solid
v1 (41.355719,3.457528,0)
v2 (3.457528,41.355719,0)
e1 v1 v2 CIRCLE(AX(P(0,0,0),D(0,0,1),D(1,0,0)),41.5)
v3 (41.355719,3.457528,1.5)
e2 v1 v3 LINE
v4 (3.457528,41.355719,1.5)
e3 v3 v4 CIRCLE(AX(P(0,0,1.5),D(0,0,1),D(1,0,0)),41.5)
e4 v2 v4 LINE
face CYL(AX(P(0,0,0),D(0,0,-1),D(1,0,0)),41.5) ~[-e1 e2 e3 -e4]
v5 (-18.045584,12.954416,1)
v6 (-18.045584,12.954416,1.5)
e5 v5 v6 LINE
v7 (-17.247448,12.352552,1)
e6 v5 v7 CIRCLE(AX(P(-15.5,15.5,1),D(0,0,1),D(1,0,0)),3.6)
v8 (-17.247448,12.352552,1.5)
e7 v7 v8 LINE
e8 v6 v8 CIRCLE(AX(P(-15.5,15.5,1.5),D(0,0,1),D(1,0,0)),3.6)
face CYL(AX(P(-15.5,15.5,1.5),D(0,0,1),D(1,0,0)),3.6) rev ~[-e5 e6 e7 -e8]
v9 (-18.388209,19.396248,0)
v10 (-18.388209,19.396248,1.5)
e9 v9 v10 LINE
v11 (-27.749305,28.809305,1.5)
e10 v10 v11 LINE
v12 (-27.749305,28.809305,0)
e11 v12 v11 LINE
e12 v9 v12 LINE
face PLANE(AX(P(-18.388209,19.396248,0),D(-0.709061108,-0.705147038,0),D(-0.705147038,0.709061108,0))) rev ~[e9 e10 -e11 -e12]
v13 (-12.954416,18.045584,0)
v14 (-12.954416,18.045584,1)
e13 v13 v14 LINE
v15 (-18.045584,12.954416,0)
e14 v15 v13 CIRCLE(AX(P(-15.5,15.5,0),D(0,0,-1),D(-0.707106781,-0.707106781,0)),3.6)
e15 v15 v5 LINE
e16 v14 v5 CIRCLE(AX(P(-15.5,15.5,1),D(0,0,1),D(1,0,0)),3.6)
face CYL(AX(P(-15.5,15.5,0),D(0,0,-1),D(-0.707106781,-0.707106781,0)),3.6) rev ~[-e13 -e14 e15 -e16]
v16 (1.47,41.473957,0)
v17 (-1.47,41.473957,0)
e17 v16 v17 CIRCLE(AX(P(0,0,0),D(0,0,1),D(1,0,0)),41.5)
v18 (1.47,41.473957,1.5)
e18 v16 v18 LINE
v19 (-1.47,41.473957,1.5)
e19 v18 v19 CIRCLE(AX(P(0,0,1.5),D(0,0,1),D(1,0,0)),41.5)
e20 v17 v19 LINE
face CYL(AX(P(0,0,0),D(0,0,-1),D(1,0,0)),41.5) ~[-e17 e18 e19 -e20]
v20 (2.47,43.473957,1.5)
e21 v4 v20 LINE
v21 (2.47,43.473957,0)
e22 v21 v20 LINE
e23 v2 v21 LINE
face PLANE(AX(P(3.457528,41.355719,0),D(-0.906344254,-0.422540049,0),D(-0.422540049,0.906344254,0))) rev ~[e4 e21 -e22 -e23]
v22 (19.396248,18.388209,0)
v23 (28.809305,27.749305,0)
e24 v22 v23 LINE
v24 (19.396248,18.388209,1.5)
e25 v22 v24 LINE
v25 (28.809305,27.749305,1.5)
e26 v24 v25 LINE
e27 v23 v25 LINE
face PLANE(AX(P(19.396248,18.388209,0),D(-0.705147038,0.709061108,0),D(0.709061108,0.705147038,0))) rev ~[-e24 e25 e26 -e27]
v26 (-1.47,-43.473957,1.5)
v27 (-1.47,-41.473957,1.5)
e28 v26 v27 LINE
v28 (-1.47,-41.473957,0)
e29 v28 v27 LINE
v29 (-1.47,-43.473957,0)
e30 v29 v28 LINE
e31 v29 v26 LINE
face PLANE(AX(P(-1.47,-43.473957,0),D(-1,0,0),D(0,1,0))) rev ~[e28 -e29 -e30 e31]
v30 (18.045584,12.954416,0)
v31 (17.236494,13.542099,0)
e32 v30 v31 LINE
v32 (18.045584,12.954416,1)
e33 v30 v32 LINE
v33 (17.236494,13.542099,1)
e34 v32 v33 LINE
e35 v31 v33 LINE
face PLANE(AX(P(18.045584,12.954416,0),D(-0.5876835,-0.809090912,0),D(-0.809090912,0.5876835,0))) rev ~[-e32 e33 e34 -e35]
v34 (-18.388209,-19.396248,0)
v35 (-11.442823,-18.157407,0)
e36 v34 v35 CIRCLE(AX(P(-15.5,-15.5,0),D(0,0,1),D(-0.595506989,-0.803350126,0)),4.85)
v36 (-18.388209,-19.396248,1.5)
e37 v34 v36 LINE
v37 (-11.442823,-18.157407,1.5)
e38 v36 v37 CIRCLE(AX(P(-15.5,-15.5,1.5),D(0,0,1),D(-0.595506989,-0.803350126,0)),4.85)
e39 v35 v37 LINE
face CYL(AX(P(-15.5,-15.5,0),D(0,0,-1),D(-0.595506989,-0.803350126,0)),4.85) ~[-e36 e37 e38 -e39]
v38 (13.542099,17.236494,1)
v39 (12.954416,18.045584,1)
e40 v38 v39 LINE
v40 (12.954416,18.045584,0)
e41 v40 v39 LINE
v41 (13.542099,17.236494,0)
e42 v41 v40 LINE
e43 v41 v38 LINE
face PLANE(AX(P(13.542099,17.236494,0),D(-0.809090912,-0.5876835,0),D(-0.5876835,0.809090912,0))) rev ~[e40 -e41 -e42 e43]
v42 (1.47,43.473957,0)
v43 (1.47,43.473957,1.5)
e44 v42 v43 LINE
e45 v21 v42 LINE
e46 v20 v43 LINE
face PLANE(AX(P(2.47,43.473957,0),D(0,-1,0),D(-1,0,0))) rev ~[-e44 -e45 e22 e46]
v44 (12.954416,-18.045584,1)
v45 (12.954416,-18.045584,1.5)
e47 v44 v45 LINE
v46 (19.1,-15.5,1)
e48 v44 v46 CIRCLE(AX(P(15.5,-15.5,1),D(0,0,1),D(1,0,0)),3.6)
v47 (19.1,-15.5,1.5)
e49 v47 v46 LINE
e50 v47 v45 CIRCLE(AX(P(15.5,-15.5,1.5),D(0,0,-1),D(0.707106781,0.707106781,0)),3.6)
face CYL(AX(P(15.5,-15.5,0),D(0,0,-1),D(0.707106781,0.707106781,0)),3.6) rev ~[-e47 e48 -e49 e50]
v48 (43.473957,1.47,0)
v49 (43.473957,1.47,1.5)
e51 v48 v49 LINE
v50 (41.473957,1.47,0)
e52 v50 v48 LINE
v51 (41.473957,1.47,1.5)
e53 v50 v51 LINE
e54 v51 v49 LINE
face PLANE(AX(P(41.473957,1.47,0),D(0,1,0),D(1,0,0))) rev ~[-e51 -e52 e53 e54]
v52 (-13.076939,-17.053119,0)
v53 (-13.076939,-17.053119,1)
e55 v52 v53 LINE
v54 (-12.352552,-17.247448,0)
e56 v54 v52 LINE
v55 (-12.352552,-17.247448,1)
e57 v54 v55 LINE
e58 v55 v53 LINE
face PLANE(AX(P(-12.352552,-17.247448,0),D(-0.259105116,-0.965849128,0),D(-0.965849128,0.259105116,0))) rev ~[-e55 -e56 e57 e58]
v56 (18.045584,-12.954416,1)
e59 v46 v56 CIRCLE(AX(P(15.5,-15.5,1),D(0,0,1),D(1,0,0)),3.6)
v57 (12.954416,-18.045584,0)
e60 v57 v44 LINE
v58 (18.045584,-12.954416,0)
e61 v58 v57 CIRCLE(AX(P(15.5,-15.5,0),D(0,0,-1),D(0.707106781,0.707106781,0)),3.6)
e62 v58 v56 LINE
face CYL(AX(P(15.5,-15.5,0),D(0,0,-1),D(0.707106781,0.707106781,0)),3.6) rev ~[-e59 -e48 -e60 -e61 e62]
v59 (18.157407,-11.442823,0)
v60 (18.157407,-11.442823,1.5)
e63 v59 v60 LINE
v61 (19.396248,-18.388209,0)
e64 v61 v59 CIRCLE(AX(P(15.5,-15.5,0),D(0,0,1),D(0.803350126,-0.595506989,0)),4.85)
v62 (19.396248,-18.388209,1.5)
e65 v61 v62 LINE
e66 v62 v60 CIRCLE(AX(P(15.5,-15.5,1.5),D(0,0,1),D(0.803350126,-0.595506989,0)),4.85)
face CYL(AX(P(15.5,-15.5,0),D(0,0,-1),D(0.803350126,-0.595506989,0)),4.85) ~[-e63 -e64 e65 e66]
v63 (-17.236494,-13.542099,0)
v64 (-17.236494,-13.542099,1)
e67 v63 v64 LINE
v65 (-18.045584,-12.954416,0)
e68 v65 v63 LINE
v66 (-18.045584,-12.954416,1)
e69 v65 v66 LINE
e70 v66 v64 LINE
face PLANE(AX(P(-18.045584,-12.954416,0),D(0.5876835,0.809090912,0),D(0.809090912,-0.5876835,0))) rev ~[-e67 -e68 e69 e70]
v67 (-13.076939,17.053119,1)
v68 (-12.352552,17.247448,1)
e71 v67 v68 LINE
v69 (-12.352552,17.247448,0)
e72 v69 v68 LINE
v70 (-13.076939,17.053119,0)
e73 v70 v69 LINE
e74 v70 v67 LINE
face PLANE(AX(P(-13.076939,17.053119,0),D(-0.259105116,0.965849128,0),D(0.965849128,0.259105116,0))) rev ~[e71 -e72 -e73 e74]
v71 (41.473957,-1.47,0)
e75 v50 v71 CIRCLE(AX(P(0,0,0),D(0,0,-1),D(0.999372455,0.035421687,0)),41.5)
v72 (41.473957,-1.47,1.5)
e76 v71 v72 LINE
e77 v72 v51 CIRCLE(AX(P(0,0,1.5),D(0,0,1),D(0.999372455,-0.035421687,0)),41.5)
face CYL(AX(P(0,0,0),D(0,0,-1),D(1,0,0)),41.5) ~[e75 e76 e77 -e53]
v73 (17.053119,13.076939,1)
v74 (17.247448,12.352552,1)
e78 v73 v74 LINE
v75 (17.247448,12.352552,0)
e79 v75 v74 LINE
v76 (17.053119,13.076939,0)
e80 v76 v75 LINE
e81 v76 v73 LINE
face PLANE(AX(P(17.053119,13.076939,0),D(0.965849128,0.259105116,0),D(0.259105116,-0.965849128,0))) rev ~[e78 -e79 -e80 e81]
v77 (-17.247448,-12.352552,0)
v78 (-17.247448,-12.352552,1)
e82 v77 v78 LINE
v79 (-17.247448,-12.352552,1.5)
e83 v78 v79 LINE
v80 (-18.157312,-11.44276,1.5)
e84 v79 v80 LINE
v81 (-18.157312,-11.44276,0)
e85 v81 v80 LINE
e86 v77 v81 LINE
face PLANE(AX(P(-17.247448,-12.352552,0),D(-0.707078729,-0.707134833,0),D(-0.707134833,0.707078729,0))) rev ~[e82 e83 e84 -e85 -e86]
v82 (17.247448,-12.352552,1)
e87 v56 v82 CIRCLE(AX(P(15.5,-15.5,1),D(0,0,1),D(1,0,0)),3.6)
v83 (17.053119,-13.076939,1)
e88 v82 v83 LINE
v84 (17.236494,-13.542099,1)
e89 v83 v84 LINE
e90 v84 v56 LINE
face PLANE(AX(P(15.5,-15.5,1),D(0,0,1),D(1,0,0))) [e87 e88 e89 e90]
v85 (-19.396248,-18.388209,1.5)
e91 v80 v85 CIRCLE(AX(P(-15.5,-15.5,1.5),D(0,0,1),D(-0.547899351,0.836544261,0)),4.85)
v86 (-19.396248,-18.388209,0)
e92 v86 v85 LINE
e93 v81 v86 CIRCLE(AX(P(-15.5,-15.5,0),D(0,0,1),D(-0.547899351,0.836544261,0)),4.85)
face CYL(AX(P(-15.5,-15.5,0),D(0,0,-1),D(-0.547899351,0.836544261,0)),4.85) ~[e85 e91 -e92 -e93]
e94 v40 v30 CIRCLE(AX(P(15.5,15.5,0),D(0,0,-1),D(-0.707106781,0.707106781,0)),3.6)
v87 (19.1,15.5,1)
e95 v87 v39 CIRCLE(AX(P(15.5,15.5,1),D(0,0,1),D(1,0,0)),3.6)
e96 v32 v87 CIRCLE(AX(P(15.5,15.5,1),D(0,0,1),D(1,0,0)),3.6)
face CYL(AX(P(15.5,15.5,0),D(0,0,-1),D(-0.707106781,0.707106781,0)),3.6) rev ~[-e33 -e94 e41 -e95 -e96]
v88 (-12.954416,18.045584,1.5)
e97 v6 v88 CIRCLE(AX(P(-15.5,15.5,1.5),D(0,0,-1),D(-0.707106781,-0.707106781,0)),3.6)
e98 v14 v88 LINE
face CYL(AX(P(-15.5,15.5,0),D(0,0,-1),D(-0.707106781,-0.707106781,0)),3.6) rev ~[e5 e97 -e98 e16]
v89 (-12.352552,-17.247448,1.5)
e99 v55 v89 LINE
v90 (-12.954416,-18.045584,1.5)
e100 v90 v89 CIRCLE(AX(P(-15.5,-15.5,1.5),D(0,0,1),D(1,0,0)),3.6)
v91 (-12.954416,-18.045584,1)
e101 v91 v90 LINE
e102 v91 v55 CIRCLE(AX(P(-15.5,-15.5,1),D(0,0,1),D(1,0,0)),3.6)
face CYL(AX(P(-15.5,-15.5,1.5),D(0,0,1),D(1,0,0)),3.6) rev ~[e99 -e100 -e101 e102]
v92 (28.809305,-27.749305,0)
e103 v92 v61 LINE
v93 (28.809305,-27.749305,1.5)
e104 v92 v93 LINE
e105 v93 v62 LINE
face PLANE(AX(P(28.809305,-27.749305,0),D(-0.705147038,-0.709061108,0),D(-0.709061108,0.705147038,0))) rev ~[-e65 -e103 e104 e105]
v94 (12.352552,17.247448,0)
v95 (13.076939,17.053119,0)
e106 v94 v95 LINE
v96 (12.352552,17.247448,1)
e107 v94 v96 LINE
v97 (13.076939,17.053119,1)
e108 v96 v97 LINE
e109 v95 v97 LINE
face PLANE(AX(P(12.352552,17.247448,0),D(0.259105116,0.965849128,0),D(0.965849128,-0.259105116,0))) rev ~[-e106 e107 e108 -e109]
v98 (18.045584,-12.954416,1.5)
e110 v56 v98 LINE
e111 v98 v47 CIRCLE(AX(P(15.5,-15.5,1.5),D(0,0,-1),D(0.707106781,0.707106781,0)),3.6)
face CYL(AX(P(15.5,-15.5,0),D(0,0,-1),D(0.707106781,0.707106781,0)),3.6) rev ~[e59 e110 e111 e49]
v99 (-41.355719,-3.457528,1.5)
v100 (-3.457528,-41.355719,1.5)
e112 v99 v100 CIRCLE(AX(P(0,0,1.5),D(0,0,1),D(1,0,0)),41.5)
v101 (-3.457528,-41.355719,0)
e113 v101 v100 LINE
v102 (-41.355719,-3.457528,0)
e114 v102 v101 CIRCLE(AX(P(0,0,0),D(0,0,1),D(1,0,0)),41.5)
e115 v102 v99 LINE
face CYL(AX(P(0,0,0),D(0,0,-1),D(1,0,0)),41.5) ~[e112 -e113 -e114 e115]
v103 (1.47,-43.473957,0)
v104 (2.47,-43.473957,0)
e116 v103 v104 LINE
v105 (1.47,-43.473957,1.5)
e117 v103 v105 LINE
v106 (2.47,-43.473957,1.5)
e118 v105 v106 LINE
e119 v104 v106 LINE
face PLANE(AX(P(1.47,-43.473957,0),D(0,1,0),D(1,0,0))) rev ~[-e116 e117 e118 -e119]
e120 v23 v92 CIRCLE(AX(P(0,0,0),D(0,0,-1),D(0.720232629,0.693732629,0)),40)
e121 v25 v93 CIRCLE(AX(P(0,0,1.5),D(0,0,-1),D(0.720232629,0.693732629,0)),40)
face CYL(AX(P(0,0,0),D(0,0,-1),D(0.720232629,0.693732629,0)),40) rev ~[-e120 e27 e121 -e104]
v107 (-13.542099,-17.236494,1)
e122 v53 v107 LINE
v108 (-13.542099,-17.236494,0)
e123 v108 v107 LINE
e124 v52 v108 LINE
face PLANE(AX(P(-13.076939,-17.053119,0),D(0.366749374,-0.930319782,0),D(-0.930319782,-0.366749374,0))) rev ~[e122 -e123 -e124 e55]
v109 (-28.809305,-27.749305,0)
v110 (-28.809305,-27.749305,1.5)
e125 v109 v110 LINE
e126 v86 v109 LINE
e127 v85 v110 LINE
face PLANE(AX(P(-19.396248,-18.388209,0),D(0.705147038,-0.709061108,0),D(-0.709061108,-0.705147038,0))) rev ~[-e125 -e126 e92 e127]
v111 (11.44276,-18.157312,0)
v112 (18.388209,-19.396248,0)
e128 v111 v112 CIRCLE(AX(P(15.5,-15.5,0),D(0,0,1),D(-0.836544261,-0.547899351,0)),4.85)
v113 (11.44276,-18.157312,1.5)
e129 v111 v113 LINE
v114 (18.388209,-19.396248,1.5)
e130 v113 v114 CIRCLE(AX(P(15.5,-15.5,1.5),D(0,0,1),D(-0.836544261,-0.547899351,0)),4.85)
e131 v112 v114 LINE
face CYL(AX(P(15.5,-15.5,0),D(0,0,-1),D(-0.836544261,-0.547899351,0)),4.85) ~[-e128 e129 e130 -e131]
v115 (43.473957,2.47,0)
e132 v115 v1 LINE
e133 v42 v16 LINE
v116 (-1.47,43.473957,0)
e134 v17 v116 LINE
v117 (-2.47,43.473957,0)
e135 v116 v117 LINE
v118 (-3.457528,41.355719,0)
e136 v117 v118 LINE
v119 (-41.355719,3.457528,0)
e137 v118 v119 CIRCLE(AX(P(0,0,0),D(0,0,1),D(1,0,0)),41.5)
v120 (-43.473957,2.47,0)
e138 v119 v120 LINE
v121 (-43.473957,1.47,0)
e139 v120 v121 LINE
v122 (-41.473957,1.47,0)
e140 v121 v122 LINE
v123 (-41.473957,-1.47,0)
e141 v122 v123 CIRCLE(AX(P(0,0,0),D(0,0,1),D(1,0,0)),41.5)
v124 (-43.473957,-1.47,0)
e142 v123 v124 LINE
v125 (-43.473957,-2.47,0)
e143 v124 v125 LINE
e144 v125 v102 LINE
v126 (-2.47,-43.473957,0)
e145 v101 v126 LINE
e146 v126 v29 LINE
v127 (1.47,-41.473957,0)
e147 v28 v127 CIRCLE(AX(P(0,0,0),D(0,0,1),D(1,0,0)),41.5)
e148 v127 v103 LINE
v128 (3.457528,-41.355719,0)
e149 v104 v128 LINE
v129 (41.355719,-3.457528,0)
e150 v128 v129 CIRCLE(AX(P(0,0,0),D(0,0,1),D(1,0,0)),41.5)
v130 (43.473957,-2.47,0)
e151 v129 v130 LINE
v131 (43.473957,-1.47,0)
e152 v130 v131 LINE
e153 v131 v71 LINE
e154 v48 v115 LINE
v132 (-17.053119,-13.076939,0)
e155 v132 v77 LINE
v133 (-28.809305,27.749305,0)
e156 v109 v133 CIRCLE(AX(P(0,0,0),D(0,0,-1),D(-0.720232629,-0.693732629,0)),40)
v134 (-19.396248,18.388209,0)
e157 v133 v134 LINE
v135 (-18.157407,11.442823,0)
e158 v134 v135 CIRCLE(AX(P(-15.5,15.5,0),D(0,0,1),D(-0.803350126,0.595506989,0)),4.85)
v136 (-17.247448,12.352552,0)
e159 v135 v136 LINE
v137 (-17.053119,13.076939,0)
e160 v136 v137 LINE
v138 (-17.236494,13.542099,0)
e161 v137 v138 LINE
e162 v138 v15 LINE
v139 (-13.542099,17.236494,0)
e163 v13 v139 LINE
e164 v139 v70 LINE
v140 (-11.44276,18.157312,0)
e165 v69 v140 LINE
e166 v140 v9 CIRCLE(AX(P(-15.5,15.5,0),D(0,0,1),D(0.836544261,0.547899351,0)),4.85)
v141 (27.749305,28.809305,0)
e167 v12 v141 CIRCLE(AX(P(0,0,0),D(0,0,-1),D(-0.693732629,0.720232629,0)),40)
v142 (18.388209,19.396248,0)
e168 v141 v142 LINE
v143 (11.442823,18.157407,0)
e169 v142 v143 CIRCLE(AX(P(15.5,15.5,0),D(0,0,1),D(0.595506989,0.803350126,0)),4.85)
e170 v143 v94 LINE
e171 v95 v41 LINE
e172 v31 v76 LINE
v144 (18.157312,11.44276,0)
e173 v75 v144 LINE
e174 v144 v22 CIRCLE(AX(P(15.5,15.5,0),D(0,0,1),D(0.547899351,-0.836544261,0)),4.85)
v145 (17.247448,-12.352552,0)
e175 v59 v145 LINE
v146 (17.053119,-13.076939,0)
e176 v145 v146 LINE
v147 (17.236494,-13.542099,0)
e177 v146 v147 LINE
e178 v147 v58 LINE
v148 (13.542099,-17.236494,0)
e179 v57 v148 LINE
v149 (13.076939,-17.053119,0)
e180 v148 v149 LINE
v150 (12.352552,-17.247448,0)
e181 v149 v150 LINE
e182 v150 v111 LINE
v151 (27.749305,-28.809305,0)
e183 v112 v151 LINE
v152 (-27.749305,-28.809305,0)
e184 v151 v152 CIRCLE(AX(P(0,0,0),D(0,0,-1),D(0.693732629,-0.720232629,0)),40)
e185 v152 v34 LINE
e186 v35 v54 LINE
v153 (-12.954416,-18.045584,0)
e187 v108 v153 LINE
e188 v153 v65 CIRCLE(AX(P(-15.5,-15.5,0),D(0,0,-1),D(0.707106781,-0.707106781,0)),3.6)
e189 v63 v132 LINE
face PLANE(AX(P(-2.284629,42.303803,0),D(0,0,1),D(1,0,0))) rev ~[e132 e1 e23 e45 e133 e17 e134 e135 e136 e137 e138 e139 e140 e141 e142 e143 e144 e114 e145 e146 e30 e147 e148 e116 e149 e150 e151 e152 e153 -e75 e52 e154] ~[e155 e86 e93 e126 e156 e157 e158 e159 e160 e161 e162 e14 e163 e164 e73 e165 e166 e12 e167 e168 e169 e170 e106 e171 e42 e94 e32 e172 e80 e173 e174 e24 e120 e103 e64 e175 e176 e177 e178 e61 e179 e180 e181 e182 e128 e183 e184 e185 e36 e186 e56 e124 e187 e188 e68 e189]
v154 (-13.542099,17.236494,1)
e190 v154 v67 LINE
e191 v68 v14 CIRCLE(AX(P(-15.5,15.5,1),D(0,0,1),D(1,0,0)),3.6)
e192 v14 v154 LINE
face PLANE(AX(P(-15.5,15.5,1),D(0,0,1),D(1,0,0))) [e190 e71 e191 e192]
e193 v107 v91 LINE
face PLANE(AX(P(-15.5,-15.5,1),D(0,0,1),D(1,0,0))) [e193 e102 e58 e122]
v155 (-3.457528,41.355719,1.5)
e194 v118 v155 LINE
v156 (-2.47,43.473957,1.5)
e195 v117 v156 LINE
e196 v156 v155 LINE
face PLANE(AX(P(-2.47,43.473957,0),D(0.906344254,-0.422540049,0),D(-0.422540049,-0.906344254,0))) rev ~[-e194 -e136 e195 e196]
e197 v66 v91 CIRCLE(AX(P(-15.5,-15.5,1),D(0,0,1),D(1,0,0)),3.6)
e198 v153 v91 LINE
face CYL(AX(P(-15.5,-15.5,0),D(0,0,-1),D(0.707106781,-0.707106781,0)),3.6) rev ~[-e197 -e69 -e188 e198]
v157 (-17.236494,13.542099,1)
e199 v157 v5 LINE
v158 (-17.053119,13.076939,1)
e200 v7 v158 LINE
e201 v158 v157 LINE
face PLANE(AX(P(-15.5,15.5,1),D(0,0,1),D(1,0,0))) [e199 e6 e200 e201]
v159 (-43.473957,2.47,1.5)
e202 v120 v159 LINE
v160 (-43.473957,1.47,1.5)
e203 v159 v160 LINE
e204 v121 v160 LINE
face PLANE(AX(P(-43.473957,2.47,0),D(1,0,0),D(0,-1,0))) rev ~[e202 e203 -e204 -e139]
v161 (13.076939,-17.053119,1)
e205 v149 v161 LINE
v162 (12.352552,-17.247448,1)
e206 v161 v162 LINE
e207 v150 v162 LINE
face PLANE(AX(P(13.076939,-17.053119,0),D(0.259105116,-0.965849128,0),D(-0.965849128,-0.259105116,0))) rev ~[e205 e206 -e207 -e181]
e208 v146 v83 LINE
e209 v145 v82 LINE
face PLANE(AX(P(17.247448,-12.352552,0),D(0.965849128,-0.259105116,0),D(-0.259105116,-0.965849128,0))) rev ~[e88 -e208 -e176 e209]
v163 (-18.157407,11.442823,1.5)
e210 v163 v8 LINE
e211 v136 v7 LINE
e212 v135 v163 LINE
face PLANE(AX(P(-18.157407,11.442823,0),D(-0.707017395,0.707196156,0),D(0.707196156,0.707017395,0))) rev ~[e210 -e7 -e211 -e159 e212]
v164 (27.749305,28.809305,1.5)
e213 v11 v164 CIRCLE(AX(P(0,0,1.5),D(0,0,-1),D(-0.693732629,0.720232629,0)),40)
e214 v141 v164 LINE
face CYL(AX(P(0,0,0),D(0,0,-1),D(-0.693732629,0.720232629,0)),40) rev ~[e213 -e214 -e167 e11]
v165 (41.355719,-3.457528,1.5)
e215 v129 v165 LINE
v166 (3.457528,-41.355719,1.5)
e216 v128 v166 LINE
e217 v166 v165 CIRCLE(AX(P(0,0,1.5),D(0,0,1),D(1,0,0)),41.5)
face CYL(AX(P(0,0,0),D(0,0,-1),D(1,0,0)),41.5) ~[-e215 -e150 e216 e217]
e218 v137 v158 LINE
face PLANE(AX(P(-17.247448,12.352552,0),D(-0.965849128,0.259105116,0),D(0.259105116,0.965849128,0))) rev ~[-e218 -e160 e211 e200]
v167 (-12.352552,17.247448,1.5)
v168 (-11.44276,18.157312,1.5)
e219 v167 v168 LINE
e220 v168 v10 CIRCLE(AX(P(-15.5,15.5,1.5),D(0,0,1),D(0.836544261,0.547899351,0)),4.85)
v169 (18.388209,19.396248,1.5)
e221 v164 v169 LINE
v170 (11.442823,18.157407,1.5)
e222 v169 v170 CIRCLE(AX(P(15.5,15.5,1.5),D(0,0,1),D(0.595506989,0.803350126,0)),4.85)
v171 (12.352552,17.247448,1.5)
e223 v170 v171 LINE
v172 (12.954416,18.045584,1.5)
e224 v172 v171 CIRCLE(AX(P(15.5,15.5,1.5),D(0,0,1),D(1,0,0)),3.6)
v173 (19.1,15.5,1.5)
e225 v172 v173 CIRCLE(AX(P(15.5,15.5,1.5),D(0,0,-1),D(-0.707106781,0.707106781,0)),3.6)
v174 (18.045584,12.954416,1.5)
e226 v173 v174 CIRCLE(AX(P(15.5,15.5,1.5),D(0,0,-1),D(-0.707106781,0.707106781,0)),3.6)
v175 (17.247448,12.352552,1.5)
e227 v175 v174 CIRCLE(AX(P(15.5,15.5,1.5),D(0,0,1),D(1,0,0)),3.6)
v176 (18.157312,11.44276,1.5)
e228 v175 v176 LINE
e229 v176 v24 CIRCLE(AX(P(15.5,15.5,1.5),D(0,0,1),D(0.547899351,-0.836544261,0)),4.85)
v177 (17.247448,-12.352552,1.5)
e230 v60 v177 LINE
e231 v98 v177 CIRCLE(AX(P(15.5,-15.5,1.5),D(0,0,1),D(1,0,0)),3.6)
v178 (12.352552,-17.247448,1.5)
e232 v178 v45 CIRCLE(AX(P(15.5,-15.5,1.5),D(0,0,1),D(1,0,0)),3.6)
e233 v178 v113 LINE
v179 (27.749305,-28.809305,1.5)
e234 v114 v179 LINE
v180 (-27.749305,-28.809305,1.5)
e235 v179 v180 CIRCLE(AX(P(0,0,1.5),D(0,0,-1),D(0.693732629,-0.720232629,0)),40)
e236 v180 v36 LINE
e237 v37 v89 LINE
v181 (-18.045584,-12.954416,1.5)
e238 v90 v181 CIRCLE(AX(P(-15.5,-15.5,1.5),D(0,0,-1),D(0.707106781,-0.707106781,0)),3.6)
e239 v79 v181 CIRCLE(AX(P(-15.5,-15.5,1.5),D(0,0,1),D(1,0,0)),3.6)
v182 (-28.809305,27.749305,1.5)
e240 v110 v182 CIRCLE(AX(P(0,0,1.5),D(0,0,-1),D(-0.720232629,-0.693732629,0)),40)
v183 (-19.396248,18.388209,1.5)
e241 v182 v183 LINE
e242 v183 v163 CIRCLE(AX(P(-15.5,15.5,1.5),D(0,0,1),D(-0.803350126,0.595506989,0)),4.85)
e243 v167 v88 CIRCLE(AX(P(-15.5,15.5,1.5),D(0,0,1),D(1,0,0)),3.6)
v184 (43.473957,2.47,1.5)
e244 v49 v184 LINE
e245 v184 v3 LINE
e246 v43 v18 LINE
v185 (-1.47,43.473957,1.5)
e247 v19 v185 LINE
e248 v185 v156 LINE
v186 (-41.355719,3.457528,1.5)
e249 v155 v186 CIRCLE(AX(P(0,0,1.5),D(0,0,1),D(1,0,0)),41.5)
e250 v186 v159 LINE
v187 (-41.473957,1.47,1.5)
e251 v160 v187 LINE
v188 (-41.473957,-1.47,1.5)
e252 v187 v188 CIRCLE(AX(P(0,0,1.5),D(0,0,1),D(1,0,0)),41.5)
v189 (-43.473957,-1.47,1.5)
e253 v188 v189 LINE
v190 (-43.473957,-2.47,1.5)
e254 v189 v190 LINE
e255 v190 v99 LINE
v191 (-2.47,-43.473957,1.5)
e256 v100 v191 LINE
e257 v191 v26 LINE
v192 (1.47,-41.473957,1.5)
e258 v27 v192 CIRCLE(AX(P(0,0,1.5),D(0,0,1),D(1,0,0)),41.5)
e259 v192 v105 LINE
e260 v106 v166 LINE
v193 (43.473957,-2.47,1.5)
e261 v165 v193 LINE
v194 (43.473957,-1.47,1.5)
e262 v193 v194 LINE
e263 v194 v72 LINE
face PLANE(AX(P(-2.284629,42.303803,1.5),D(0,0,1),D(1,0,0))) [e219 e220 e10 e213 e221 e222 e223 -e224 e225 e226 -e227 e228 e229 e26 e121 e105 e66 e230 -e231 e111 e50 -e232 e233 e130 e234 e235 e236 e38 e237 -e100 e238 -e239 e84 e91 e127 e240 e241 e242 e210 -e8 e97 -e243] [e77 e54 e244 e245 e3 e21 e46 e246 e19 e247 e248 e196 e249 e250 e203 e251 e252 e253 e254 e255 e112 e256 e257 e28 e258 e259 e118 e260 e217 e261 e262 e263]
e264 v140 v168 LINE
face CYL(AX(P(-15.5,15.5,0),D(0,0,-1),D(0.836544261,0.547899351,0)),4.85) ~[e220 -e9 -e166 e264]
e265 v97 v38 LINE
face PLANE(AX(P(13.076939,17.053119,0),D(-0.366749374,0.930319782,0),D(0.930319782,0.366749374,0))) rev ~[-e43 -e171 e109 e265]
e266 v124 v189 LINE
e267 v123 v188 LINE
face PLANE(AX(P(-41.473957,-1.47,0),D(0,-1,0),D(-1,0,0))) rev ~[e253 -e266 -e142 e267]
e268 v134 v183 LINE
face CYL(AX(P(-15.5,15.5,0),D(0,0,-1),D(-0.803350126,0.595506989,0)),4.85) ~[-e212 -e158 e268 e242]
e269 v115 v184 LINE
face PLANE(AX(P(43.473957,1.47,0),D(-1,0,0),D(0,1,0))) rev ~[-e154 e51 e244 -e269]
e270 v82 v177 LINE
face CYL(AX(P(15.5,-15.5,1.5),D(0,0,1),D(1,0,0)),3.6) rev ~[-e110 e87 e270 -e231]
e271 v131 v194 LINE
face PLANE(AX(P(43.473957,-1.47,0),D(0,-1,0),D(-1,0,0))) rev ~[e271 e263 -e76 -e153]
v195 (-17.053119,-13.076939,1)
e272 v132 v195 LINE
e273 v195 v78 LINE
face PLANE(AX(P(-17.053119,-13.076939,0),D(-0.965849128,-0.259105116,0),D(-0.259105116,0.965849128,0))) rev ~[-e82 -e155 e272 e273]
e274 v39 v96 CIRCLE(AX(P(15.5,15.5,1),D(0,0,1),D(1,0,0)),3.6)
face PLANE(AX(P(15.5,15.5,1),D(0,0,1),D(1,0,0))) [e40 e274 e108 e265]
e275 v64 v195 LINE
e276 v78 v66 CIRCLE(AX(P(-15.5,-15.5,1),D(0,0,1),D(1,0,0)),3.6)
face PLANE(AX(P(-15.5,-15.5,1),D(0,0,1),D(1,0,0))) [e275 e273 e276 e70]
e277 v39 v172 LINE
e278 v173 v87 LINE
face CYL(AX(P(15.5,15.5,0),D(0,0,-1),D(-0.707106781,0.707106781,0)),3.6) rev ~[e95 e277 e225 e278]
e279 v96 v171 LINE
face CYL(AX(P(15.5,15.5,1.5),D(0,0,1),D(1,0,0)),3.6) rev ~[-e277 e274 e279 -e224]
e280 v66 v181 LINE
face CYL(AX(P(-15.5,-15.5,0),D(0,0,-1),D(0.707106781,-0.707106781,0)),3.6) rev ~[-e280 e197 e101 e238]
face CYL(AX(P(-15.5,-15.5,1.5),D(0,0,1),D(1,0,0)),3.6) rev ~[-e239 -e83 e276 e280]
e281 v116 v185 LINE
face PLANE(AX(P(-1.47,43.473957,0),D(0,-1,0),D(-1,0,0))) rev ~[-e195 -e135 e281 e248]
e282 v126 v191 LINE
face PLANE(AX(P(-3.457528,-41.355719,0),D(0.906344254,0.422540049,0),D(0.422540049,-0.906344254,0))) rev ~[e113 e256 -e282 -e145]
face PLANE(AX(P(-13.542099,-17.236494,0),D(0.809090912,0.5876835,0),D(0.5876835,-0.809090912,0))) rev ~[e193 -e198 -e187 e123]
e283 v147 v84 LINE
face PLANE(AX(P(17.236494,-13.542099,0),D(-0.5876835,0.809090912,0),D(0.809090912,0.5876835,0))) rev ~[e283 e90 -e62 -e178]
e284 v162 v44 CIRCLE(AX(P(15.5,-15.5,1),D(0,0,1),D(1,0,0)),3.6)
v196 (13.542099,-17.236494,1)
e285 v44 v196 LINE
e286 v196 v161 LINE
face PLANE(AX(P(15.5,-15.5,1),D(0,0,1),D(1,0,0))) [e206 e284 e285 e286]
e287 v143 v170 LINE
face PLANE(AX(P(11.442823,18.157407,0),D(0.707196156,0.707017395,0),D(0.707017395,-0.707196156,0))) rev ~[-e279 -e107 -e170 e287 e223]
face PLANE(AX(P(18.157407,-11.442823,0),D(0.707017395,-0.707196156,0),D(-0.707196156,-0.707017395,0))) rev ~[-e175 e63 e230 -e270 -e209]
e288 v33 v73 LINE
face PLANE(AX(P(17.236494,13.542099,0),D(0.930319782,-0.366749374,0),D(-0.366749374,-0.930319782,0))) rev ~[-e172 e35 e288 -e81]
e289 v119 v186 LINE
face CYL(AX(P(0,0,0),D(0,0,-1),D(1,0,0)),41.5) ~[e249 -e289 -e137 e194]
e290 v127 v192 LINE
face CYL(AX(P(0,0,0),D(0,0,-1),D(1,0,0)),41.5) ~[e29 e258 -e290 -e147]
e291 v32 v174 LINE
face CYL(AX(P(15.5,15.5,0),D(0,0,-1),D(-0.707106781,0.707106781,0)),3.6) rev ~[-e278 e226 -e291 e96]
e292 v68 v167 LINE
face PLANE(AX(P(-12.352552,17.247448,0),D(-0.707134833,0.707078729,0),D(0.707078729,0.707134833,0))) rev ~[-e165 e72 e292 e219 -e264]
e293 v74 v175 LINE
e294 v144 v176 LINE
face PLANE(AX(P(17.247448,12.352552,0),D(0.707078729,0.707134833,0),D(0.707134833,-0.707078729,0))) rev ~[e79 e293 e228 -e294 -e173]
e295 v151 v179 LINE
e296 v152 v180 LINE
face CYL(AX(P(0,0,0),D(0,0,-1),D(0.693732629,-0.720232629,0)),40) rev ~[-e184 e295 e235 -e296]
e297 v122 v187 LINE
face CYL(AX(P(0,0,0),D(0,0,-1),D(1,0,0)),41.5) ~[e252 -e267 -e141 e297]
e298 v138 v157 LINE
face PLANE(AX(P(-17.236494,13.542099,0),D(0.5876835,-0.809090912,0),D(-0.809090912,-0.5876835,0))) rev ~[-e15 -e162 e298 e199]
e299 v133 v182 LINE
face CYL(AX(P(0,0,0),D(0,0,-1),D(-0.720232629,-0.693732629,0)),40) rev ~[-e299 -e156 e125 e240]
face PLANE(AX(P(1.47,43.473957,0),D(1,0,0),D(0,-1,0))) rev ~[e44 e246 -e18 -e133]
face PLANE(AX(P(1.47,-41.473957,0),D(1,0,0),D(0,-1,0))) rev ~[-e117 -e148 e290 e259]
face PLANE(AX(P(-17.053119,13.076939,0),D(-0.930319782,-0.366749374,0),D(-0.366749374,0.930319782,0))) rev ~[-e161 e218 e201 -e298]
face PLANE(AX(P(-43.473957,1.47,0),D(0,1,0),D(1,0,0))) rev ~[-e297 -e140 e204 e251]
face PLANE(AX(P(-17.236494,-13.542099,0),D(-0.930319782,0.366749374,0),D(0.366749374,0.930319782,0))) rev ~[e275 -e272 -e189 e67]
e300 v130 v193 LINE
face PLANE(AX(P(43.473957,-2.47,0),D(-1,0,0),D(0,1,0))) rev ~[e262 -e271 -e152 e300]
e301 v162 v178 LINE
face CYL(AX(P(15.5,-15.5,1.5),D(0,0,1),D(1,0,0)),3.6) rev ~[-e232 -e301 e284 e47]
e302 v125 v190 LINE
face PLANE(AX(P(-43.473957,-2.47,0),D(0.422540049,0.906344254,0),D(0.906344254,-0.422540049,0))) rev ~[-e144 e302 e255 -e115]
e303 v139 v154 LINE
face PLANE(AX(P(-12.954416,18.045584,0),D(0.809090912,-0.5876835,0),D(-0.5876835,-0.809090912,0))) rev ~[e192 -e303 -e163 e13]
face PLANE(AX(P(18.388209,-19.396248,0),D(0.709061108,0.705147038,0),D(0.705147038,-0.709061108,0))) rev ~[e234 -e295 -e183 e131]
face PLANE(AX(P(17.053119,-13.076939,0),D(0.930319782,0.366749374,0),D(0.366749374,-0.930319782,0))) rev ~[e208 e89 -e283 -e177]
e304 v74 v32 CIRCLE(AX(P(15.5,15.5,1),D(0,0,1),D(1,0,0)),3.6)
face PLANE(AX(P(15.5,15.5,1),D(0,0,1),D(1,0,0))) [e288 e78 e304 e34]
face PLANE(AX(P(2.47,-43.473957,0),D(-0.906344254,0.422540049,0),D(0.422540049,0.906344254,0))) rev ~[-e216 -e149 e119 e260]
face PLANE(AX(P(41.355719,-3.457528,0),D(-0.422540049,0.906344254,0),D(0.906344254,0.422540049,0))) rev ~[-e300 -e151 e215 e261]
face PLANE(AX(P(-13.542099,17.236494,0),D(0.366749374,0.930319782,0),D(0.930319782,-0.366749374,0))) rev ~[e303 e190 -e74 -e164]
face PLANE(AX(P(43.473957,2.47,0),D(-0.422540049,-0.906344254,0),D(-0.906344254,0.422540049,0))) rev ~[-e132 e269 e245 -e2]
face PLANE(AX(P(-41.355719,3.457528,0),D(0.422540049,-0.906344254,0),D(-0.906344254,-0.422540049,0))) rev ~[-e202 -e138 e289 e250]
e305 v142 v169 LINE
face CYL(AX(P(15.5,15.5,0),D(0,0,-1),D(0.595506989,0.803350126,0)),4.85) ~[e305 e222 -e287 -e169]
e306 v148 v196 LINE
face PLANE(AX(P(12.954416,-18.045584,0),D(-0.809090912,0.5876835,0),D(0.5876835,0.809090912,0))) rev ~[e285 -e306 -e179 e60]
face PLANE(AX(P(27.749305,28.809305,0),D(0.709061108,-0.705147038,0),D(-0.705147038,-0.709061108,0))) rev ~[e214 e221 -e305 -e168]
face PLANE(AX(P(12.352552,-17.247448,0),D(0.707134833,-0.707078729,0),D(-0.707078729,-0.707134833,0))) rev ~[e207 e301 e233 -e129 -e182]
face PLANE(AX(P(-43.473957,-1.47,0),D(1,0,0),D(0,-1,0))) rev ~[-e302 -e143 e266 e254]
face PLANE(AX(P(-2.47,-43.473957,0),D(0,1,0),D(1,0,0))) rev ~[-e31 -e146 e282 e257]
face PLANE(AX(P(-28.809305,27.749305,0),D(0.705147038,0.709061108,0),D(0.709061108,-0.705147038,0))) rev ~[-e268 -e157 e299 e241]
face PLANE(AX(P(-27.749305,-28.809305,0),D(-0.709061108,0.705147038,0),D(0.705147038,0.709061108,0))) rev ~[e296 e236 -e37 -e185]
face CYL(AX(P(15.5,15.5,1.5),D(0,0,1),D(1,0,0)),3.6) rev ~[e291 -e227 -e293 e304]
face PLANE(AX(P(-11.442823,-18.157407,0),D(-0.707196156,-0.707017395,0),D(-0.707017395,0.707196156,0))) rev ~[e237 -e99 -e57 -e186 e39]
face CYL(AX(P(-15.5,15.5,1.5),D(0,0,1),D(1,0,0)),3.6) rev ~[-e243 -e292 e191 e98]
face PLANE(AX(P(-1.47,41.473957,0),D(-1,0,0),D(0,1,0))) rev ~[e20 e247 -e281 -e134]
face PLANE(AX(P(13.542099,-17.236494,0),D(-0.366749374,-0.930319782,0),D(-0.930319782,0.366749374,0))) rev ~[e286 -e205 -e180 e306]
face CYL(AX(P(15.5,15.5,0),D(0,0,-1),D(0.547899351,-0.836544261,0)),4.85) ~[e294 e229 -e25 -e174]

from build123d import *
from build123d import SkipClean  # not in build123d's __all__

# Parameters (mm, degrees)
F1_R     = 41.5
F3_DEPTH = 1.5
F4_DEPTH = 1.5
F5_R     = 3.6
F6_DEPTH = 0.5


with BuildPart() as f3:
    # F1 (on face) → F3 (new body)
    with BuildSketch(Plane.XY):
        Circle(F1_R)
        with BuildLine():
            Line((-17.2474476501, 12.3525523499), (-17.0531188132, 13.0769391962))
            Line((-17.0531188132, 13.0769391962), (-17.2364935, 13.5420990873))
            Line((-17.2364935, 13.5420990873), (-18.0455844123, 12.9544155877))
            ThreePointArc((-18.0455844123, 12.9544155877), (-18.0455844123, 18.0455844123), (-12.9544155877, 18.0455844123))
            Line((-12.9544155877, 18.0455844123), (-13.5420990873, 17.2364935))
            Line((-13.5420990873, 17.2364935), (-13.0769391962, 17.0531188132))
            Line((-13.0769391962, 17.0531188132), (-12.3525523499, 17.2474476501))
            Line((-12.3525523499, 17.2474476501), (-11.442760334, 18.1573118546))
            ThreePointArc((-11.442760334, 18.1573118546), (-14.6482964144, 20.2746309807), (-18.3882088979, 19.3962481135))
            Line((-18.3882088979, 19.3962481135), (-27.7493051541, 28.8093051541))
            ThreePointArc((-27.7493051541, 28.8093051541), (0, 40), (27.7493051541, 28.8093051541))
            Line((27.7493051541, 28.8093051541), (18.3882088979, 19.3962481135))
            ThreePointArc((18.3882088979, 19.3962481135), (14.6483525281, 20.27464099), (11.442822795, 18.1574072189))
            Line((11.442822795, 18.1574072189), (12.3525523499, 17.2474476501))
            Line((12.3525523499, 17.2474476501), (13.0769391962, 17.0531188132))
            Line((13.0769391962, 17.0531188132), (13.5420990873, 17.2364935))
            Line((13.5420990873, 17.2364935), (12.9544155877, 18.0455844123))
            ThreePointArc((12.9544155877, 18.0455844123), (18.0455844123, 18.0455844123), (18.0455844123, 12.9544155877))
            Line((18.0455844123, 12.9544155877), (17.2364935, 13.5420990873))
            Line((17.2364935, 13.5420990873), (17.0531188132, 13.0769391962))
            Line((17.0531188132, 13.0769391962), (17.2474476501, 12.3525523499))
            Line((17.2474476501, 12.3525523499), (18.1573118546, 11.442760334))
            ThreePointArc((18.1573118546, 11.442760334), (20.2746309807, 14.6482964144), (19.3962481135, 18.3882088979))
            Line((19.3962481135, 18.3882088979), (28.8093051541, 27.7493051541))
            ThreePointArc((28.8093051541, 27.7493051541), (40, 0), (28.8093051541, -27.7493051541))
            Line((28.8093051541, -27.7493051541), (19.3962481135, -18.3882088979))
            ThreePointArc((19.3962481135, -18.3882088979), (20.27464099, -14.6483525281), (18.1574072189, -11.442822795))
            Line((18.1574072189, -11.442822795), (17.2474476501, -12.3525523499))
            Line((17.2474476501, -12.3525523499), (17.0531188132, -13.0769391962))
            Line((17.0531188132, -13.0769391962), (17.2364935, -13.5420990873))
            Line((17.2364935, -13.5420990873), (18.0455844123, -12.9544155877))
            ThreePointArc((18.0455844123, -12.9544155877), (18.0455844123, -18.0455844123), (12.9544155877, -18.0455844123))
            Line((12.9544155877, -18.0455844123), (13.5420990873, -17.2364935))
            Line((13.5420990873, -17.2364935), (13.0769391962, -17.0531188132))
            Line((13.0769391962, -17.0531188132), (12.3525523499, -17.2474476501))
            Line((12.3525523499, -17.2474476501), (11.442760334, -18.1573118546))
            ThreePointArc((11.442760334, -18.1573118546), (14.6482964144, -20.2746309807), (18.3882088979, -19.3962481135))
            Line((18.3882088979, -19.3962481135), (27.7493051541, -28.8093051541))
            ThreePointArc((27.7493051541, -28.8093051541), (0, -40), (-27.7493051541, -28.8093051541))
            Line((-27.7493051541, -28.8093051541), (-18.3882088979, -19.3962481135))
            ThreePointArc((-18.3882088979, -19.3962481135), (-14.6483525281, -20.27464099), (-11.442822795, -18.1574072189))
            Line((-11.442822795, -18.1574072189), (-12.3525523499, -17.2474476501))
            Line((-12.3525523499, -17.2474476501), (-13.0769391962, -17.0531188132))
            Line((-13.0769391962, -17.0531188132), (-13.5420990873, -17.2364935))
            Line((-13.5420990873, -17.2364935), (-12.9544155877, -18.0455844123))
            ThreePointArc((-12.9544155877, -18.0455844123), (-18.0455844123, -18.0455844123), (-18.0455844123, -12.9544155877))
            Line((-18.0455844123, -12.9544155877), (-17.2364935, -13.5420990873))
            Line((-17.2364935, -13.5420990873), (-17.0531188132, -13.0769391962))
            Line((-17.0531188132, -13.0769391962), (-17.2474476501, -12.3525523499))
            Line((-17.2474476501, -12.3525523499), (-18.1573118546, -11.442760334))
            ThreePointArc((-18.1573118546, -11.442760334), (-20.2746309807, -14.6482964144), (-19.3962481135, -18.3882088979))
            Line((-19.3962481135, -18.3882088979), (-28.8093051541, -27.7493051541))
            ThreePointArc((-28.8093051541, -27.7493051541), (-40, 0), (-28.8093051541, 27.7493051541))
            Line((-28.8093051541, 27.7493051541), (-19.3962481135, 18.3882088979))
            ThreePointArc((-19.3962481135, 18.3882088979), (-20.27464099, 14.6483525281), (-18.1574072189, 11.442822795))
            Line((-18.1574072189, 11.442822795), (-17.2474476501, 12.3525523499))
        make_face(mode=Mode.SUBTRACT)
    extrude(amount=F3_DEPTH)

    # F2 (on Top) → F4 (join)
    with BuildSketch(Plane.XY):
        Polygon((-1.47, 41.4739568886), (-1.47, 43.4739568886), (-2.47, 43.4739568886), (-3.4575279787, 41.3557190758), align=None)
        Polygon((2.47, 43.4739568886), (1.47, 43.4739568886), (1.47, 41.4739568886), (3.4575279787, 41.3557190758), align=None)
        Polygon((-43.4739568886, 2.47), (-43.4739568886, 1.47), (-41.4739568886, 1.47), (-41.3557190758, 3.4575279787), align=None)
        Polygon((-41.4739568886, -1.47), (-43.4739568886, -1.47), (-43.4739568886, -2.47), (-41.3557190758, -3.4575279787), align=None)
        Polygon((-2.47, -43.4739568886), (-1.47, -43.4739568886), (-1.47, -41.4739568886), (-3.4575279787, -41.3557190758), align=None)
        Polygon((1.47, -41.4739568886), (1.47, -43.4739568886), (2.47, -43.4739568886), (3.4575279787, -41.3557190758), align=None)
        Polygon((43.4739568886, -2.47), (43.4739568886, -1.47), (41.4739568886, -1.47), (41.3557190758, -3.4575279787), align=None)
        Polygon((41.4739568886, 1.47), (43.4739568886, 1.47), (43.4739568886, 2.47), (41.3557190758, 3.4575279787), align=None)
    extrude(amount=F4_DEPTH)

    # F5 (on face) → F6 (cut)
    with BuildSketch(Plane.XY.offset(1.5)):
        with Locations((-15.5, 15.5)):
            Circle(F5_R)
        with Locations((-15.5, -15.5)):
            Circle(F5_R)
        with Locations((15.5, -15.5)):
            Circle(F5_R)
        with Locations((15.5, 15.5)):
            Circle(F5_R)
    with SkipClean():  # cleaning this boolean's faces spoils the solid; the shape is the same uncleaned
        extrude(amount=-F6_DEPTH, mode=Mode.SUBTRACT)


solid = f3.part
